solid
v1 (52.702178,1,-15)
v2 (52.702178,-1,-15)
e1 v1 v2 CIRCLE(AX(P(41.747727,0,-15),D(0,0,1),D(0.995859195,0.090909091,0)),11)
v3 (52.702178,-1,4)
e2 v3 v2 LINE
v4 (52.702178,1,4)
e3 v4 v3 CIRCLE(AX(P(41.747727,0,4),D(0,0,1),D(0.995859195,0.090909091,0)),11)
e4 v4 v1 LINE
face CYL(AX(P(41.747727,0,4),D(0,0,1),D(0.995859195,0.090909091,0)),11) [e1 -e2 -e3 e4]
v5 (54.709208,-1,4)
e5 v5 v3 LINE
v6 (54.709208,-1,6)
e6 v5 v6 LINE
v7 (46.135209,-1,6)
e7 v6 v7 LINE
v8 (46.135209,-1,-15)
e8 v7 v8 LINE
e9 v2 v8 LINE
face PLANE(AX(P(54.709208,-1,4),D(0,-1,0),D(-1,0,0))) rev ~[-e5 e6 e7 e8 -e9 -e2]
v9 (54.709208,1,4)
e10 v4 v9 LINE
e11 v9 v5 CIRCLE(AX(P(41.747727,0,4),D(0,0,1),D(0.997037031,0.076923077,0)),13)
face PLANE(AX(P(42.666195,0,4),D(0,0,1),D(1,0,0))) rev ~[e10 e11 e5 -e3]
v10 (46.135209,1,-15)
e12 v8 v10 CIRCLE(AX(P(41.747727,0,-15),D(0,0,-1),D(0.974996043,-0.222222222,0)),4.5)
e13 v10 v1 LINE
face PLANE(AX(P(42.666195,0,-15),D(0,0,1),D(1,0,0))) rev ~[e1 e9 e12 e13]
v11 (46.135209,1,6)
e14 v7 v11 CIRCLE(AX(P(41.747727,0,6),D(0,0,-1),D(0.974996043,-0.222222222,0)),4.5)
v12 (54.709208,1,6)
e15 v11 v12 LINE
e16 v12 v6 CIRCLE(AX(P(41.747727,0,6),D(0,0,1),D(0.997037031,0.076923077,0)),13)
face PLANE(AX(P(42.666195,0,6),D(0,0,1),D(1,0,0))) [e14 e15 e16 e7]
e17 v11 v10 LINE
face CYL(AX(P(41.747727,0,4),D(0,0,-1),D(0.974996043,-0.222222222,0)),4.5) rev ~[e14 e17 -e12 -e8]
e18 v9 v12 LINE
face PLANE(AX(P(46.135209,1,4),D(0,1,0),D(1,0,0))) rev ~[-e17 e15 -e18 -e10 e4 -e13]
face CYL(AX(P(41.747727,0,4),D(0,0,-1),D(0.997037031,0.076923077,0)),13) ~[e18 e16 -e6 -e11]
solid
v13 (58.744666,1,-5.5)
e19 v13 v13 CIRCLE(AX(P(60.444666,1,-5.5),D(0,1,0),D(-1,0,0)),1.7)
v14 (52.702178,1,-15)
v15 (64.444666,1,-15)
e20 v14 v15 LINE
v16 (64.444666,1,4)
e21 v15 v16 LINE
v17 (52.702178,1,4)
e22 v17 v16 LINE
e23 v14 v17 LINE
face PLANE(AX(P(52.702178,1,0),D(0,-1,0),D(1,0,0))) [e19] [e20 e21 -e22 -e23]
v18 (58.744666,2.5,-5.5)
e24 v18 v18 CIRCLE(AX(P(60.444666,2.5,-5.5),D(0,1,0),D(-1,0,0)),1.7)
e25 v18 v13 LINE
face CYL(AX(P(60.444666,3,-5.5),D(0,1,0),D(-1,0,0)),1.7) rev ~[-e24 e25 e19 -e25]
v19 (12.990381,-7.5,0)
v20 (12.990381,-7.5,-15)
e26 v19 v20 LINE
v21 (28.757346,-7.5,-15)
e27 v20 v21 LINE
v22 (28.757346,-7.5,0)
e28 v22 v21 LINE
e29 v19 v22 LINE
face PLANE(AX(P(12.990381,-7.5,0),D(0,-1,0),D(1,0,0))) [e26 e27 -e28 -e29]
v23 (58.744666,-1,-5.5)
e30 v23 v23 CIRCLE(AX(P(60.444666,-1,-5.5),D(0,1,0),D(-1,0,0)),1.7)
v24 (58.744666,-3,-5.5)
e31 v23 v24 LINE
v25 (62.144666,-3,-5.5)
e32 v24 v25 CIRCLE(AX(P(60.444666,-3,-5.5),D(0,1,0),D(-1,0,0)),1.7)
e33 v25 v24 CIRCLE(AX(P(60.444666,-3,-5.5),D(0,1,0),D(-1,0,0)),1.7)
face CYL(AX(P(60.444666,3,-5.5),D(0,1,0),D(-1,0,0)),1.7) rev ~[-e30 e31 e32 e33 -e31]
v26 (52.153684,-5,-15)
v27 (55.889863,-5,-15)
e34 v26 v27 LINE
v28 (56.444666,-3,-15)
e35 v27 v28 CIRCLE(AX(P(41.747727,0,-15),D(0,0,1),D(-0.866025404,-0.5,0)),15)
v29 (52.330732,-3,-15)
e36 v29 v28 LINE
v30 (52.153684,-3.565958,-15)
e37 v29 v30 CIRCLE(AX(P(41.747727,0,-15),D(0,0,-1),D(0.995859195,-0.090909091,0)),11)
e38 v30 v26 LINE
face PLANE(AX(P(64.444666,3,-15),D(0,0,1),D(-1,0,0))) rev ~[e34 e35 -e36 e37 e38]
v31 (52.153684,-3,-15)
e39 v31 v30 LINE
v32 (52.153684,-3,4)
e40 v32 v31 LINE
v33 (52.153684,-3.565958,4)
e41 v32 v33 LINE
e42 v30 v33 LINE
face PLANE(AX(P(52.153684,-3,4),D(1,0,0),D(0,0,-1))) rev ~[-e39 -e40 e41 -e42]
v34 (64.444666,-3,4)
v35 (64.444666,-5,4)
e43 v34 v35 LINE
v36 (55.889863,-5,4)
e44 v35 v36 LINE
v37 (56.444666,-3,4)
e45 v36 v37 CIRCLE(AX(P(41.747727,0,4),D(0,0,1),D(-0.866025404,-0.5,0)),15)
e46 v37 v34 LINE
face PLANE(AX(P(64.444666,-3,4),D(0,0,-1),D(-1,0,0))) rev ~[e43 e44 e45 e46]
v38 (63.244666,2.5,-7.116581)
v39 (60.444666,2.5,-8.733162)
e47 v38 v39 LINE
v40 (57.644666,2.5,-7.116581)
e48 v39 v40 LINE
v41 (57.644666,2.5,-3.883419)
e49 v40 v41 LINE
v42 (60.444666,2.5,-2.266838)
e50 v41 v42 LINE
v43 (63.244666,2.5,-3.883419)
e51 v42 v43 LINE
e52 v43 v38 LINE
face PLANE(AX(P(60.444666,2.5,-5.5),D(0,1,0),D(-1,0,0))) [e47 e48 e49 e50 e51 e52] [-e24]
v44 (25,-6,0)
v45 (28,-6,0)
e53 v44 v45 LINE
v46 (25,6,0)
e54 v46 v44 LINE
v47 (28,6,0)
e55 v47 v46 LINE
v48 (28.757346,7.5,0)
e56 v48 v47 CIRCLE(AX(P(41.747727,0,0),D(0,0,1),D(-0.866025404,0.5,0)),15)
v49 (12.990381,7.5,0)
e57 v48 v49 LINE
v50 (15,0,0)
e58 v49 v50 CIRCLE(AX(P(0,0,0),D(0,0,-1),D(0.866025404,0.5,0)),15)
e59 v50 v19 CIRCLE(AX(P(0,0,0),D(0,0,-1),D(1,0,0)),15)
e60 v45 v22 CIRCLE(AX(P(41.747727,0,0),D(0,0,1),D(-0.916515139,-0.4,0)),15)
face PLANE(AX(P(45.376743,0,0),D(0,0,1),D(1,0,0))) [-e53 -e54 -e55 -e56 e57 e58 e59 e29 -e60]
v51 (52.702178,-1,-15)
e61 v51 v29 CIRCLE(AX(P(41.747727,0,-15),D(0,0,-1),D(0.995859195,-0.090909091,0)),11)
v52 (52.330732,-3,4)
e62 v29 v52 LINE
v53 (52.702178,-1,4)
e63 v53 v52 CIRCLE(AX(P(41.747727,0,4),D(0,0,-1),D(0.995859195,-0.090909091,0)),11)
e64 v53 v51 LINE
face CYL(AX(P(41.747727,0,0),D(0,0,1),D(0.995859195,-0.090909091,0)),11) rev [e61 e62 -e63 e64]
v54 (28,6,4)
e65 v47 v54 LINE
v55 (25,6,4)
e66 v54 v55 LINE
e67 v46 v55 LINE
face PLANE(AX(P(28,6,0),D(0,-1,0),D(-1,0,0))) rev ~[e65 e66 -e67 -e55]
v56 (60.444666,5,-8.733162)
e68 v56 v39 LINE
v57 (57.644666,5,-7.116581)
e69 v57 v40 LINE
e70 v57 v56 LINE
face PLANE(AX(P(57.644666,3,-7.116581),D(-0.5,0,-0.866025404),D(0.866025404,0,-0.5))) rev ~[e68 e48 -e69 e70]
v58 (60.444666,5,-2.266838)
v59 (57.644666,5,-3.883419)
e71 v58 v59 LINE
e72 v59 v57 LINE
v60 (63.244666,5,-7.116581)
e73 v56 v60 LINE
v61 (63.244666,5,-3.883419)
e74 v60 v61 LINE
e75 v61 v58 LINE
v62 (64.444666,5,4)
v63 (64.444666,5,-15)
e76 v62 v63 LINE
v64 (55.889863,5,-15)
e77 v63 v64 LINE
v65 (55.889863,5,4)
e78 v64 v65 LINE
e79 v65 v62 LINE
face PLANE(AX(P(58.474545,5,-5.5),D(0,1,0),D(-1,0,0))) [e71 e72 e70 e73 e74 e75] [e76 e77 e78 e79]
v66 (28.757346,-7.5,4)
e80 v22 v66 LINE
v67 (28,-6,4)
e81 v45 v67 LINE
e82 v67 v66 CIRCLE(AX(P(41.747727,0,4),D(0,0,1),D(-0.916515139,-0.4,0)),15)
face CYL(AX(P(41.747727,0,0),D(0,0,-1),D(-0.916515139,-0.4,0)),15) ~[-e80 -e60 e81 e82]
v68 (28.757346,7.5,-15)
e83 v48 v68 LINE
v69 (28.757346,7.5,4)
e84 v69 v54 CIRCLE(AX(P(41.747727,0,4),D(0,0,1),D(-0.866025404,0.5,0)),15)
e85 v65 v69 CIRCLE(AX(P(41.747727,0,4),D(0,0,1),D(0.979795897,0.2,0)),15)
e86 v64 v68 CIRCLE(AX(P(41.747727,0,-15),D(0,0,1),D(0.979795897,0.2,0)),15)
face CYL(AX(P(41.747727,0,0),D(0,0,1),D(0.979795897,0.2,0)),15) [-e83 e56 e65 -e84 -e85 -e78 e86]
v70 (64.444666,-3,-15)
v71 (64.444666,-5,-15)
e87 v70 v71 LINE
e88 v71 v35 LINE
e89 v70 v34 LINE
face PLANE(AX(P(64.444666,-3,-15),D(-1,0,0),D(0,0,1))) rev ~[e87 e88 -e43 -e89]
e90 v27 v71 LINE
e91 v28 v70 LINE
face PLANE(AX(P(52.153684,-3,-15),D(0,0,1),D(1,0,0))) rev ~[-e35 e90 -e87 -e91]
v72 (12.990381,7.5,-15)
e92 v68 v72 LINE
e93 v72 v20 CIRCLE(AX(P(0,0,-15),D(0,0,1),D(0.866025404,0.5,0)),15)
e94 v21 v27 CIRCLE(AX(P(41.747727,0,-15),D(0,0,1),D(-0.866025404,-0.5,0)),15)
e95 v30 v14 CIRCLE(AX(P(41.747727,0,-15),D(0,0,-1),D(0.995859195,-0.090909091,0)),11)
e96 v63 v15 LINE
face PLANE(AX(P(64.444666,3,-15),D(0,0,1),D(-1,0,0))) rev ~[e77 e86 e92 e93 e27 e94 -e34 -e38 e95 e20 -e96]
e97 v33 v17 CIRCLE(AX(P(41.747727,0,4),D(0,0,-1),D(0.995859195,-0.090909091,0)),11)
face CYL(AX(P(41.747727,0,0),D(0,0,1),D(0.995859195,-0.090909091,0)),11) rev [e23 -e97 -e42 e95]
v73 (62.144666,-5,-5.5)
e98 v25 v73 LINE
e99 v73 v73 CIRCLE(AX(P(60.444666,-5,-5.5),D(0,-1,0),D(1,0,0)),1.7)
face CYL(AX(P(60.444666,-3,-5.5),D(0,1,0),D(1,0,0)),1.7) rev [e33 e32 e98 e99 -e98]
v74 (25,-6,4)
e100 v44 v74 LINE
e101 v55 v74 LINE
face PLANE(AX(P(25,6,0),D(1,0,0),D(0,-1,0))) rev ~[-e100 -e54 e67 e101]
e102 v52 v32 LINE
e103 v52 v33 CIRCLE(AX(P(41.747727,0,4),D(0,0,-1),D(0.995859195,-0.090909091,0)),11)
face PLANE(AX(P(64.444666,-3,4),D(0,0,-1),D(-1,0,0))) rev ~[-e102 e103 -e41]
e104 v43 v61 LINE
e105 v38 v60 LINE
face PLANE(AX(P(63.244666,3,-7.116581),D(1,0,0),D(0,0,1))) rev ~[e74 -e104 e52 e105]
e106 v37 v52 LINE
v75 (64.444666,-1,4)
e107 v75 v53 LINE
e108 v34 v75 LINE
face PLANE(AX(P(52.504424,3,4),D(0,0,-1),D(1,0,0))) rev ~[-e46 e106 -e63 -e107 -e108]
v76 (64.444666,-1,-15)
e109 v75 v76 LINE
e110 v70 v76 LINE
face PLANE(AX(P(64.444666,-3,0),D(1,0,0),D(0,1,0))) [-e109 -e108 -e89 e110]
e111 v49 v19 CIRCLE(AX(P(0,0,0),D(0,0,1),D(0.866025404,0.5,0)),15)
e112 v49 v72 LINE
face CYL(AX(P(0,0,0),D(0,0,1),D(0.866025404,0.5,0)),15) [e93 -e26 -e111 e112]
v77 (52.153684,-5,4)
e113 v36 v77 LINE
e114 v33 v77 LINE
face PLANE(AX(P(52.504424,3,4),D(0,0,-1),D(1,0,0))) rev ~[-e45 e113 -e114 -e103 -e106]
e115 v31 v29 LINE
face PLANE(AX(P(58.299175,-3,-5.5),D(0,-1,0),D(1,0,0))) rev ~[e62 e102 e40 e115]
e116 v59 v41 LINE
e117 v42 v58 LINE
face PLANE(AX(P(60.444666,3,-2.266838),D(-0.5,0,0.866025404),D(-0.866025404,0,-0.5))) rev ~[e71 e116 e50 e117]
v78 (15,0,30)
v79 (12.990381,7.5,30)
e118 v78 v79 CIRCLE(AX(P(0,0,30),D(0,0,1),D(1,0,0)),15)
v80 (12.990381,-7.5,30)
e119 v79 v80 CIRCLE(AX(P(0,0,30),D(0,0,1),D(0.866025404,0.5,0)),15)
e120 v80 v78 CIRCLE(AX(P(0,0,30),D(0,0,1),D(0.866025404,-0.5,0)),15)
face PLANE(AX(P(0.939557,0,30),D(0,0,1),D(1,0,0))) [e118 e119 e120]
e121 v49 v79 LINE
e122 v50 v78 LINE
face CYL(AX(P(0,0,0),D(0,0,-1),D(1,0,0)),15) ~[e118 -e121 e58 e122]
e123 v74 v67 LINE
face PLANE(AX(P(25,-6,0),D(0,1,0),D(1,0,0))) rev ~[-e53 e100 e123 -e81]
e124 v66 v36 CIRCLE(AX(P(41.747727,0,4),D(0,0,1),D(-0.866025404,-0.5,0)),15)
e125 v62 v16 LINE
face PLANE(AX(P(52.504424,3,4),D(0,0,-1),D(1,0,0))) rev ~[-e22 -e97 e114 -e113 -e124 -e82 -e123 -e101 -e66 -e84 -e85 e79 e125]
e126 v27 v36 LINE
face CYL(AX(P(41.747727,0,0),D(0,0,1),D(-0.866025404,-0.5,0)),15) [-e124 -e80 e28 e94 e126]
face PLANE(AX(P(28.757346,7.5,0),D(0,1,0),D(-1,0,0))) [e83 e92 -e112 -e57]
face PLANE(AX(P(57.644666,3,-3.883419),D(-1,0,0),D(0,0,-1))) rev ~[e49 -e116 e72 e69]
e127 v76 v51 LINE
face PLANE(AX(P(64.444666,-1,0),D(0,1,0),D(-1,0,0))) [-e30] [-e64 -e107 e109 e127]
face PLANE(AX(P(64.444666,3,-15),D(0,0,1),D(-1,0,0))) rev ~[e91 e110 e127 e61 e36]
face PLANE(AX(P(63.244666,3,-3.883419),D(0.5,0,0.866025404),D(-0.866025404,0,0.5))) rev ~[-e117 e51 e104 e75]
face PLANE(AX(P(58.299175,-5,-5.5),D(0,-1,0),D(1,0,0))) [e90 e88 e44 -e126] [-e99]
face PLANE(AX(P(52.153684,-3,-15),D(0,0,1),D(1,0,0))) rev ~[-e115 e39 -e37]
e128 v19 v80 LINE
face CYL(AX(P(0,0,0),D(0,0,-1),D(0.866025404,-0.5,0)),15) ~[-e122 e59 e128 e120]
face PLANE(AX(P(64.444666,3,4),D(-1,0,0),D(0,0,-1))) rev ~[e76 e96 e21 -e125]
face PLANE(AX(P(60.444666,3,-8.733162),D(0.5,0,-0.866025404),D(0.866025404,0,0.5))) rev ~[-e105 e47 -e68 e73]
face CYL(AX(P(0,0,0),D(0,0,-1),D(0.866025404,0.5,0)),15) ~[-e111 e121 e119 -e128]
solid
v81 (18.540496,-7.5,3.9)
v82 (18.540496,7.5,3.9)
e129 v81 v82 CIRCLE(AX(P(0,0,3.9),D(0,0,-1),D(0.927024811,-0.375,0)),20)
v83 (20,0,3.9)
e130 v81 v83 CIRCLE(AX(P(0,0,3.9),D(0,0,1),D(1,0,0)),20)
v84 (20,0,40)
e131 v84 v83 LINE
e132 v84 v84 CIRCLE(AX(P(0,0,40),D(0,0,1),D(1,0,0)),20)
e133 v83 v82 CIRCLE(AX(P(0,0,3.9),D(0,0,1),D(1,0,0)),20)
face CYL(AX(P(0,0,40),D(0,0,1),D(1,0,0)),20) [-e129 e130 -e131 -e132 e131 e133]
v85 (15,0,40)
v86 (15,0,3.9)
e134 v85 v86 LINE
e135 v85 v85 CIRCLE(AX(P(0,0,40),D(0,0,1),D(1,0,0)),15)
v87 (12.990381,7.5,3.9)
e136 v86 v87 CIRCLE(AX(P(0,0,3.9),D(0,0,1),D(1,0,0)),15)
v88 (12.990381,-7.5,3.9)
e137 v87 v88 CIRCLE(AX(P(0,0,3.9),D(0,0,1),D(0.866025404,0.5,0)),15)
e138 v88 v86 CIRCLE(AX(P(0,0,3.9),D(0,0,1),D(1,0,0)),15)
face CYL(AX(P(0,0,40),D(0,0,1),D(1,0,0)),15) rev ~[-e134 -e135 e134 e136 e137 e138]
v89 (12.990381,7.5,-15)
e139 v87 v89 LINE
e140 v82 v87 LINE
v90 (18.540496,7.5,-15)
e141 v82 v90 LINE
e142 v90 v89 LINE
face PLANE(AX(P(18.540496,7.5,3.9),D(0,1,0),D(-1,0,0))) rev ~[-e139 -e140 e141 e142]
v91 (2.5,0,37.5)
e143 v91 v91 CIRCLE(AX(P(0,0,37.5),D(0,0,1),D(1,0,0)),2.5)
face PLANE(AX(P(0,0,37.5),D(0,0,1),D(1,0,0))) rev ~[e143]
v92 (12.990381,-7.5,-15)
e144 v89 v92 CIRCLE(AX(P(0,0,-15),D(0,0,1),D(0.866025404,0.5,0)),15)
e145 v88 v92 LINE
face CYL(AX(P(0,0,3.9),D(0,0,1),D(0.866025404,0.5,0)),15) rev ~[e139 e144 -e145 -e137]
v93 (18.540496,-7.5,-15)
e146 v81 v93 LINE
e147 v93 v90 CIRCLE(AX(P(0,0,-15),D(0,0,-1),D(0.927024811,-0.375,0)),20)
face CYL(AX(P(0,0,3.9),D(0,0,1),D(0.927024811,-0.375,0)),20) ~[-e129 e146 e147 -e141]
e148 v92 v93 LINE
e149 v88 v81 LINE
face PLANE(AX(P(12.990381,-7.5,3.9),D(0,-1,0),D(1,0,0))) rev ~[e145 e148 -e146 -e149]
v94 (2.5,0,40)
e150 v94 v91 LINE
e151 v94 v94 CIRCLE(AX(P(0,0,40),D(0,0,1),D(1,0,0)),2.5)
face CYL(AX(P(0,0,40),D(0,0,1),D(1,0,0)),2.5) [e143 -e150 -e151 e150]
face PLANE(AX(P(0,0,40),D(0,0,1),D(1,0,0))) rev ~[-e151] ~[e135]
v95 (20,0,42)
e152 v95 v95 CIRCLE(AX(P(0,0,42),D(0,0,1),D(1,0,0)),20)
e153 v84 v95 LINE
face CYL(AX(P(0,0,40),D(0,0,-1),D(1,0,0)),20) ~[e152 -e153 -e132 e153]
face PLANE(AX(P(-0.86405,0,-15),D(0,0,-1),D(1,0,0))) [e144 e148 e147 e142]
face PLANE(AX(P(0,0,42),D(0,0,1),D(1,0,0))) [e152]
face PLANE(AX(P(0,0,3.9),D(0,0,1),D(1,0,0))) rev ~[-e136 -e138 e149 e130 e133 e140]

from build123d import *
from build123d import SkipClean  # not in build123d's __all__

# Parameters (mm, degrees)
F1_DEPTH      = 4
F2_DEPTH      = 15
F3_DEPTH      = 30
F3_DEPTH_BACK = 15
F4_R          = 1.7
F5_DEPTH      = 0.5
F6_DEPTH      = 6
F8_DEPTH      = 19
F9_DEPTH      = 2
F11_DEPTH     = 2
F12_R         = 1.7
F13_DEPTH     = 2
F15_R         = 2.5
F16_DEPTH     = 2.5
F15_R_2       = 20
F15_R_3       = 15
F17_DEPTH     = 36.1
F18_DEPTH     = 2
F20_DEPTH     = 18.9


with BuildPart() as f1:
    # F0 (on Top) → F1 (new body)
    with BuildSketch(Plane.XY):
        with BuildLine():
            ThreePointArc((28, -6), (26.7477270849, 0), (28, 6))
            Line((28, 6), (25, 6))
            Line((25, 6), (25, 0))
            Line((25, 0), (25, -6))
            Line((25, -6), (28, -6))
        make_face()
        with BuildLine():
            ThreePointArc((52.702178235, -1), (30.7477270849, 0), (52.702178235, 1))
            Line((52.702178235, 1), (56.4446655416, 1))
            Line((56.4446655416, 1), (64.4446655416, 1))
            Line((64.4446655416, 1), (64.4446655416, 3))
            Line((64.4446655416, 3), (56.4446655416, 3))
            ThreePointArc((56.4446655416, 3), (44.1540904281, 14.805722389), (28.7573460281, 7.5))
            ThreePointArc((28.7573460281, 7.5), (28.3576521505, 6.7606133784), (28, 6))
            ThreePointArc((28, 6), (26.7477270849, 0), (28, -6))
            ThreePointArc((28, -6), (28.3576521505, -6.7606133784), (28.7573460281, -7.5))
            ThreePointArc((28.7573460281, -7.5), (44.1540904281, -14.805722389), (56.4446655416, -3))
            Line((56.4446655416, -3), (64.4446655416, -3))
            Line((64.4446655416, -3), (64.4446655416, -1))
            Line((64.4446655416, -1), (56.4446655416, -1))
            Line((56.4446655416, -1), (52.702178235, -1))
        make_face()
    extrude(amount=F1_DEPTH)

    # F0 (on Top) → F2 (join)
    with BuildSketch(Plane.XY):
        with BuildLine():
            ThreePointArc((52.702178235, -1), (30.7477270849, 0), (52.702178235, 1))
            Line((52.702178235, 1), (56.4446655416, 1))
            Line((56.4446655416, 1), (64.4446655416, 1))
            Line((64.4446655416, 1), (64.4446655416, 3))
            Line((64.4446655416, 3), (56.4446655416, 3))
            ThreePointArc((56.4446655416, 3), (44.1540904281, 14.805722389), (28.7573460281, 7.5))
            ThreePointArc((28.7573460281, 7.5), (28.3576521505, 6.7606133784), (28, 6))
            ThreePointArc((28, 6), (26.7477270849, 0), (28, -6))
            ThreePointArc((28, -6), (28.3576521505, -6.7606133784), (28.7573460281, -7.5))
            ThreePointArc((28.7573460281, -7.5), (44.1540904281, -14.805722389), (56.4446655416, -3))
            Line((56.4446655416, -3), (64.4446655416, -3))
            Line((64.4446655416, -3), (64.4446655416, -1))
            Line((64.4446655416, -1), (56.4446655416, -1))
            Line((56.4446655416, -1), (52.702178235, -1))
        make_face()
        with BuildLine():
            ThreePointArc((28, -6), (26.7477270849, 0), (28, 6))
            Line((28, 6), (25, 6))
            Line((25, 6), (25, 0))
            Line((25, 0), (25, -6))
            Line((25, -6), (28, -6))
        make_face()
        with BuildLine():
            ThreePointArc((28, 6), (28.3576521505, 6.7606133784), (28.7573460281, 7.5))
            Line((28.7573460281, 7.5), (12.9903810568, 7.5))
            ThreePointArc((12.9903810568, 7.5), (14.4888873943, 3.8822856765), (15, 0))
            ThreePointArc((15, 0), (14.4888873943, -3.8822856765), (12.9903810568, -7.5))
            Line((12.9903810568, -7.5), (28.7573460281, -7.5))
            ThreePointArc((28.7573460281, -7.5), (28.3576521505, -6.7606133784), (28, -6))
            Line((28, -6), (25, -6))
            Line((25, -6), (25, 0))
            Line((25, 0), (25, 6))
            Line((25, 6), (28, 6))
        make_face()
    extrude(amount=-F2_DEPTH)

    # F0 (on Top) → F3 (join, two sides)
    with BuildSketch(Plane.XY) as f3_sk:
        with BuildLine():
            ThreePointArc((15, 0), (14.4888873943, 3.8822856765), (12.9903810568, 7.5))
            ThreePointArc((12.9903810568, 7.5), (-15, 0), (12.9903810568, -7.5))
            ThreePointArc((12.9903810568, -7.5), (14.4888873943, -3.8822856765), (15, 0))
        make_face()
    extrude(amount=F3_DEPTH)
    extrude(f3_sk.sketch, amount=-F3_DEPTH_BACK)

    # F4 (on face) → F5 (cut)
    with BuildSketch(Plane(origin=(0, 3, 0), x_dir=(-1, 0, 0), z_dir=(0, 1, 0))):
        Polygon((-63.2446655416, -7.1165807537), (-60.4446655416, -8.7331615075), (-57.6446655416, -7.1165807537), (-57.6446655416, -3.8834192463), (-60.4446655416, -2.2668384925), (-63.2446655416, -3.8834192463), align=None)
        with Locations((-60.4446655416, -5.5)):
            Circle(F4_R, mode=Mode.SUBTRACT)
    extrude(amount=-F5_DEPTH, mode=Mode.SUBTRACT)

    # F6 (cut, through all): a face of the model
    f6_faces = [f1.faces().sort_by_distance(p)[0] for p in [
        (60.4446655416, 3, -5.5),
    ]]
    extrude(f6_faces, amount=-F6_DEPTH, mode=Mode.SUBTRACT)

    # F10 (on face) → F11 (join)
    with BuildSketch(Plane(origin=(0, 3, 0), x_dir=(-1, 0, 0), z_dir=(0, 1, 0))):
        Polygon((-64.4446655416, -15), (-56.4446655416, -15), (-52.5044240057, -15), (-52.5044240057, 4), (-56.4446655416, 4), (-64.4446655416, 4), align=None)
        Polygon((-63.2446655416, -7.1165807537), (-63.2446655416, -3.8834192463), (-60.4446655416, -2.2668384925), (-57.6446655416, -3.8834192463), (-57.6446655416, -7.1165807537), (-60.4446655416, -8.7331615075), align=None, mode=Mode.SUBTRACT)
    extrude(amount=F11_DEPTH)

    # F12 (on face) → F13 (join)
    with BuildSketch(Plane.XZ.offset(3)):
        Polygon((64.4446655416, 4), (56.4446655416, 4), (52.1536841989, 4), (52.1536841989, -15), (56.4446655416, -15), (64.4446655416, -15), align=None)
        with Locations((60.4446655416, -5.5)):
            Circle(F12_R, mode=Mode.SUBTRACT)
    with SkipClean():  # cleaning this boolean's faces spoils the solid; the shape is the same uncleaned
        extrude(amount=F13_DEPTH)


with BuildPart() as f8:
    # F7 (on face) → F8 (new body, through all)
    with BuildSketch(Plane.XY.offset(4)):
        with BuildLine():
            Line((46.1352092786, 1), (52.702178235, 1))
            ThreePointArc((52.702178235, 1), (30.7477270849, 0), (52.702178235, -1))
            Line((52.702178235, -1), (46.1352092786, -1))
            ThreePointArc((46.1352092786, -1), (37.2477270849, 0), (46.1352092786, 1))
        make_face()
    extrude(amount=-F8_DEPTH)

    # F7 (on face) → F9 (join)
    with BuildSketch(Plane.XY.offset(4)):
        with BuildLine():
            Line((46.1352092786, 1), (52.702178235, 1))
            ThreePointArc((52.702178235, 1), (30.7477270849, 0), (52.702178235, -1))
            Line((52.702178235, -1), (46.1352092786, -1))
            ThreePointArc((46.1352092786, -1), (37.2477270849, 0), (46.1352092786, 1))
        make_face()
        with BuildLine():
            ThreePointArc((52.702178235, -1), (30.7477270849, 0), (52.702178235, 1))
            Line((52.702178235, 1), (54.7092084817, 1))
            ThreePointArc((54.7092084817, 1), (28.7477270849, 0), (54.7092084817, -1))
            Line((54.7092084817, -1), (52.702178235, -1))
        make_face()
    extrude(amount=F9_DEPTH)


with BuildPart() as f16:
    # F15 (on offset) → F16 (new body)
    with BuildSketch(Plane.XY.offset(40)):
        Circle(F15_R)
    extrude(amount=-F16_DEPTH)



with BuildPart() as f17:
    # F15 (on offset) → F17 (new body)
    with BuildSketch(Plane.XY.offset(40)):
        Circle(F15_R_2)
        Circle(F15_R_3, mode=Mode.SUBTRACT)
    extrude(amount=-F17_DEPTH)


with BuildPart() as f16_1:
    add(f16.part, clean=False)

    add(f17.part)  # F18 merges F17
    # F15 (on offset) → F18 (join)
    with BuildSketch(Plane.XY.offset(40)):
        Circle(F15_R_2)
        Circle(F15_R_3, mode=Mode.SUBTRACT)
        Circle(F15_R_3)
        Circle(F15_R, mode=Mode.SUBTRACT)
        Circle(F15_R)
    extrude(amount=F18_DEPTH)

    # F19 (on face) → F20 (join, through all)
    with BuildSketch(Plane(origin=(0, 0, 3.9), x_dir=(1, 0, 0), z_dir=(0, 0, -1))):
        with BuildLine():
            ThreePointArc((12.9903810568, -7.5), (-15, 0), (12.9903810568, 7.5))
            Line((12.9903810568, 7.5), (18.5404962177, 7.5))
            ThreePointArc((18.5404962177, 7.5), (-20, 0), (18.5404962177, -7.5))
            Line((18.5404962177, -7.5), (12.9903810568, -7.5))
        make_face()
    extrude(amount=F20_DEPTH)


solid = Compound([f1.part, f8.part, f16_1.part])
